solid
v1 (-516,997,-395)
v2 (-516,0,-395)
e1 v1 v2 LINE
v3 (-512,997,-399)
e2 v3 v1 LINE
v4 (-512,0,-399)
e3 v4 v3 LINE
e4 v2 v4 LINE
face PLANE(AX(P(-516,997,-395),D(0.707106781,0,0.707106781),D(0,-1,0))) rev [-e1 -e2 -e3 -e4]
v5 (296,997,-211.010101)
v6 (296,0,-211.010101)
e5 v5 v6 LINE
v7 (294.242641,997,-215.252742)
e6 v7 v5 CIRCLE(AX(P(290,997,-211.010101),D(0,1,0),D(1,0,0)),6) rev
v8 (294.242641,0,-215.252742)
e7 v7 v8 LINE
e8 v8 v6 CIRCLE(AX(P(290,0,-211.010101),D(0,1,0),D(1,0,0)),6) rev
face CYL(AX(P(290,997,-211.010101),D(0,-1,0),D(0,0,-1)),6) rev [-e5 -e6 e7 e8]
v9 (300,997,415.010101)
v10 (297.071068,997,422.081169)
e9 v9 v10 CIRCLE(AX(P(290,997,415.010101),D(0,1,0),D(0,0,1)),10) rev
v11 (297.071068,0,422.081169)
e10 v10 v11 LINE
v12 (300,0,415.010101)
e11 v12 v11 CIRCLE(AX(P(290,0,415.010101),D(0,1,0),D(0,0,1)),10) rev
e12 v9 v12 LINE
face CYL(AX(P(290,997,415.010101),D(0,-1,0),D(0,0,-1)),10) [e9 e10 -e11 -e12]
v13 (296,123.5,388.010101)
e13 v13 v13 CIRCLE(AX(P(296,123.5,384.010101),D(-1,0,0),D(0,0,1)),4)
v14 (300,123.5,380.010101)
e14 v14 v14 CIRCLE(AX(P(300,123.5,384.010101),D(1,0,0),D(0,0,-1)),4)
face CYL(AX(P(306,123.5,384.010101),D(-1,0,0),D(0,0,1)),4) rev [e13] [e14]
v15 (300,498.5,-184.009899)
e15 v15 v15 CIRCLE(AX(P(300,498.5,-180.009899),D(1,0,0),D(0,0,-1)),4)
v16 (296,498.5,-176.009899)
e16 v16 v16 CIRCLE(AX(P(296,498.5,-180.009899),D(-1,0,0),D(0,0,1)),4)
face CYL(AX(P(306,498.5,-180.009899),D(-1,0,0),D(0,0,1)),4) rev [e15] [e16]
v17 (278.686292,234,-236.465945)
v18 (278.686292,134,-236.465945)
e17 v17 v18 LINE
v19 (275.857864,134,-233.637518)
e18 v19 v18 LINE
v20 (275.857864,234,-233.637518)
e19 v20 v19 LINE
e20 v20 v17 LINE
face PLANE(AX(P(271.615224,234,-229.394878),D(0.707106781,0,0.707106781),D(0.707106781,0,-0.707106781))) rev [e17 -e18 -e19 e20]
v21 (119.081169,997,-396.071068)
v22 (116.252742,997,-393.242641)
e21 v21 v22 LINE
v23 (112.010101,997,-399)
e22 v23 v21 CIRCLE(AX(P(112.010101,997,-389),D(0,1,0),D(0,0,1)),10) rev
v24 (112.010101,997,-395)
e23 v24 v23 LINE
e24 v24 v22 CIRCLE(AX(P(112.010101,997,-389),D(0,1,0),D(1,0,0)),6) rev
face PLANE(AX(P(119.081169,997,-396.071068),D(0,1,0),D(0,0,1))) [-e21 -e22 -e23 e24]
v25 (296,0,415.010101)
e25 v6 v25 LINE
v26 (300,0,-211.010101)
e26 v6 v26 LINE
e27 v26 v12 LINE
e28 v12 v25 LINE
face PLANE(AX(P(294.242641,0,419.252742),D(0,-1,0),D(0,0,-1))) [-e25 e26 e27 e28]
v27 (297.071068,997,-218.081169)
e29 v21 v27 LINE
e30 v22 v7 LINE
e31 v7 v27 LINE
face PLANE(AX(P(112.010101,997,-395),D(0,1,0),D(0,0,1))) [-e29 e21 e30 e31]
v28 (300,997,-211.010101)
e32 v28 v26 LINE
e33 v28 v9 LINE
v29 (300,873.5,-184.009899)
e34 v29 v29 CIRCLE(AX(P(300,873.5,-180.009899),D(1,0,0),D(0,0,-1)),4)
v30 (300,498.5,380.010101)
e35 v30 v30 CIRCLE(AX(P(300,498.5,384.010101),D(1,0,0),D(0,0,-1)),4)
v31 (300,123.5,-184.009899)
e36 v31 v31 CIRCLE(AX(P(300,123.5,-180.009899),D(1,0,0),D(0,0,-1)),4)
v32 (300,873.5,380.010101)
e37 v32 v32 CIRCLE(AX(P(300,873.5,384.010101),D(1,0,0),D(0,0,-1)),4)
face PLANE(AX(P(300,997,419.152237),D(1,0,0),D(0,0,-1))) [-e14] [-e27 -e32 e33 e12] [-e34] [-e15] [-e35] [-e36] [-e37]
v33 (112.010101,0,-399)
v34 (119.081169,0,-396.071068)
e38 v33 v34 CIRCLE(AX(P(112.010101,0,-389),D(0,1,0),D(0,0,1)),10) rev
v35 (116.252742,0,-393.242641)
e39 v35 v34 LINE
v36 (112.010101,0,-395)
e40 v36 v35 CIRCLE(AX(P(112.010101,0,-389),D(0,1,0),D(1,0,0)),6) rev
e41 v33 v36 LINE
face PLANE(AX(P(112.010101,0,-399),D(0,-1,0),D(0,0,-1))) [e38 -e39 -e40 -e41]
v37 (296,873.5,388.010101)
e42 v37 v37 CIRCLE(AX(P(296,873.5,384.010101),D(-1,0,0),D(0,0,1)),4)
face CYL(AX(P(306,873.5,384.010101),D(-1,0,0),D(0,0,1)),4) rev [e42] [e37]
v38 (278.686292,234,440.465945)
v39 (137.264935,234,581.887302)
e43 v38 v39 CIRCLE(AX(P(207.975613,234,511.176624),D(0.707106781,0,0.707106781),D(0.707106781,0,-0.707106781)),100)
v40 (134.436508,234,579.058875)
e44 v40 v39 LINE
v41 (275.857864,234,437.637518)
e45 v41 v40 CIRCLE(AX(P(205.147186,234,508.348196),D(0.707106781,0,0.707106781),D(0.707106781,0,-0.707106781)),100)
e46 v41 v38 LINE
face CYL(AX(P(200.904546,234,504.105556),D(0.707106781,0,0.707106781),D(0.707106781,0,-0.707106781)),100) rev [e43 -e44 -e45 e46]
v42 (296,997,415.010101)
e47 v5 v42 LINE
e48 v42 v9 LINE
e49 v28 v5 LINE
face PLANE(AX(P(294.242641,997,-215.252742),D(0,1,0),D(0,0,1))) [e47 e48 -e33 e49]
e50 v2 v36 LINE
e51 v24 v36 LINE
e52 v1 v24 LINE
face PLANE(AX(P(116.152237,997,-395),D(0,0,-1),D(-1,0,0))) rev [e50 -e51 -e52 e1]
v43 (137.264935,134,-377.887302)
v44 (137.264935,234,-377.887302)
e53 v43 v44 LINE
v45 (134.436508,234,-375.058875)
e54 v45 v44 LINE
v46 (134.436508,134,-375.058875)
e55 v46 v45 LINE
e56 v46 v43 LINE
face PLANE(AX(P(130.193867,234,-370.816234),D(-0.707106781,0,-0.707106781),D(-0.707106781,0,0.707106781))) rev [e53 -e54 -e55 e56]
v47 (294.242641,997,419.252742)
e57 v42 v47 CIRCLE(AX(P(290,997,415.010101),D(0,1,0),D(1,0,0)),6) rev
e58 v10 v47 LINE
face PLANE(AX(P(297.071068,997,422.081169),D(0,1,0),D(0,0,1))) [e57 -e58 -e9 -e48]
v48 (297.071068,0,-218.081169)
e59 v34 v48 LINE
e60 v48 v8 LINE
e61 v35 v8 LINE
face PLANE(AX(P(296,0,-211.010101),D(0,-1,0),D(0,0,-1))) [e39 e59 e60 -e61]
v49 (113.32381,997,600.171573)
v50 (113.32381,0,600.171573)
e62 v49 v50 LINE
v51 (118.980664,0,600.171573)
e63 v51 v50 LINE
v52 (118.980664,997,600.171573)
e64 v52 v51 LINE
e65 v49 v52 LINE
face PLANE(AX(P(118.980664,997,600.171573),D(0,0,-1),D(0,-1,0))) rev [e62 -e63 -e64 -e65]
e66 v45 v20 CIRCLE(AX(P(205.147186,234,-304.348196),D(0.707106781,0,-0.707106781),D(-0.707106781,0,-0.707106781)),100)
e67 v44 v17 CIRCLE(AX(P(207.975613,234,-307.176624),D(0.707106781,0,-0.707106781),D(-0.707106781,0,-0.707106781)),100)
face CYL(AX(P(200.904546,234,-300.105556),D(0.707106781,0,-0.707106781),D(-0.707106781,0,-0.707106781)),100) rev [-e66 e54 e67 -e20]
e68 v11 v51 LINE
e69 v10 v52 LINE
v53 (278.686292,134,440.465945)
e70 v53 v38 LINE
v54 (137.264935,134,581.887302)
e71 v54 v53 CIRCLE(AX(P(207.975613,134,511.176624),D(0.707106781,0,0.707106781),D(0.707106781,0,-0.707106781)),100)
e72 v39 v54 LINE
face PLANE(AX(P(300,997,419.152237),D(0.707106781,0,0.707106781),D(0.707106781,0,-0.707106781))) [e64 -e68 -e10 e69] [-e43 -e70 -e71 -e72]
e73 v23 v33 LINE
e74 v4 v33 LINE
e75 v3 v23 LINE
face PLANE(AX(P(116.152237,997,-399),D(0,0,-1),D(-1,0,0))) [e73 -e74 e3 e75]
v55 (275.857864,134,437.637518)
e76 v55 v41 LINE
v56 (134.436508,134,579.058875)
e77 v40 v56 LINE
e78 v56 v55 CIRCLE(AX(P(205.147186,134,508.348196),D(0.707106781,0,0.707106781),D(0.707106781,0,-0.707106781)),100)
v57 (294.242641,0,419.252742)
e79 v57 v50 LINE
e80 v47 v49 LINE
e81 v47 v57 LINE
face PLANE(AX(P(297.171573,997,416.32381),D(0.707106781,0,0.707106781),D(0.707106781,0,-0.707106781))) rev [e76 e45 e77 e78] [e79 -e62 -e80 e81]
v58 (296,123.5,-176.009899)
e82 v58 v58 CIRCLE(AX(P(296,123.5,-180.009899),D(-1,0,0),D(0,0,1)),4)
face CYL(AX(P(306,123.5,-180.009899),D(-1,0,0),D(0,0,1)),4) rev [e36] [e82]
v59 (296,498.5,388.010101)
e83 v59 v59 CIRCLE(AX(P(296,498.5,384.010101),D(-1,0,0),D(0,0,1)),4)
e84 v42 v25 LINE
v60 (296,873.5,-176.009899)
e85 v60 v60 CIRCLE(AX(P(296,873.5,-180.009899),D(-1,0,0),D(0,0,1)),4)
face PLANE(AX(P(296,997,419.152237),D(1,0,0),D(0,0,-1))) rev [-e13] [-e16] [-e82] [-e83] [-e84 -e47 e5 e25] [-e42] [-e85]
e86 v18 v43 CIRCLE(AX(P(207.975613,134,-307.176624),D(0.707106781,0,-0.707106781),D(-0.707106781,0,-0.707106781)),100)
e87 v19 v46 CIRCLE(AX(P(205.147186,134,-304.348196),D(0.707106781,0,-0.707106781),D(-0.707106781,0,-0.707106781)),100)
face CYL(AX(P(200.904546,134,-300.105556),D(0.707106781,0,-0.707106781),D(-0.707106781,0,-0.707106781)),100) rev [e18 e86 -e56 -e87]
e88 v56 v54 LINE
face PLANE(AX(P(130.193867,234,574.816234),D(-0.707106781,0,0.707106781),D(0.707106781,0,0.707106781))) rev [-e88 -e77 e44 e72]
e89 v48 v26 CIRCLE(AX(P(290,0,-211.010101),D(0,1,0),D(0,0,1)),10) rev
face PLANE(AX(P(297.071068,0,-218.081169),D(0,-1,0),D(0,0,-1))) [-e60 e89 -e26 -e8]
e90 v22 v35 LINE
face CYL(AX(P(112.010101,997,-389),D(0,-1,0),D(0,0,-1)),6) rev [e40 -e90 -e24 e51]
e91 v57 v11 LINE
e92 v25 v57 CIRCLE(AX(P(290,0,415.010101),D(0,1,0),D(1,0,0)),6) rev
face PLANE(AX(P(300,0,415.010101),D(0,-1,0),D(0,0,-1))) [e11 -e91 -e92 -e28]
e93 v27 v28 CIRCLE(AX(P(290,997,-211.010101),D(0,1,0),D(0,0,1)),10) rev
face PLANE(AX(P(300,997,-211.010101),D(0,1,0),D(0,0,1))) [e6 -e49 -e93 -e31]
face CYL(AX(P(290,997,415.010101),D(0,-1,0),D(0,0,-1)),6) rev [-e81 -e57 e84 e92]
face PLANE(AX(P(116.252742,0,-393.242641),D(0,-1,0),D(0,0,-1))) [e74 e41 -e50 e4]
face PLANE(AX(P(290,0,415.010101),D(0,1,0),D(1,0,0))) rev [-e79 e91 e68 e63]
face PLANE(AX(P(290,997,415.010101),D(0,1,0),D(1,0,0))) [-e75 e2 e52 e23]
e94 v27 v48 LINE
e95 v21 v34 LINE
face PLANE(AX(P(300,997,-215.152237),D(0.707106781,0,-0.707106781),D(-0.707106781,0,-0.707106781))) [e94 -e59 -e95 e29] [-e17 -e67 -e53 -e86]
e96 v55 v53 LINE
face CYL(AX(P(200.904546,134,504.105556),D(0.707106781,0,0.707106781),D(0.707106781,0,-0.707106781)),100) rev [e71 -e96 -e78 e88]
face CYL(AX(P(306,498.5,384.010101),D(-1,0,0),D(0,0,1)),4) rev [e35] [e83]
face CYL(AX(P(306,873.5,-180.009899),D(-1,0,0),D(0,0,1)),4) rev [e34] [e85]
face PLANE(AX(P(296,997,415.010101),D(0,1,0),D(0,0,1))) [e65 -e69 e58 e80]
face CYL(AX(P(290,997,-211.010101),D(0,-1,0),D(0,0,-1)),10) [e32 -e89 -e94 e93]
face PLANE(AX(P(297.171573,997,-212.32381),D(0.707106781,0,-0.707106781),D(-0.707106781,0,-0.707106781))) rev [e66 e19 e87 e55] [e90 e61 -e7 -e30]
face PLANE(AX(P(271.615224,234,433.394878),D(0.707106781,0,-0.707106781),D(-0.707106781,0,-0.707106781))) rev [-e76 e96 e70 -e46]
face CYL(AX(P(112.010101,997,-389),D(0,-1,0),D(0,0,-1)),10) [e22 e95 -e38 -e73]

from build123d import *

# Parameters (mm, degrees)
BASE_FLANGE1_DEPTH   = 997
CUT_EXTRUDE1_DEPTH   = 10
SKETCH5_R            = 4
CUT_EXTRUDE2_DEPTH   = 10
CUT_EXTRUDE4_DEPTH   = 10
LPATTERN1_COUNT      = 3
LPATTERN1_PITCH      = 375
LPATTERN1_COUNT_DIR2 = 2
LPATTERN1_PITCH_DIR2 = 564.02
CHAMFER1_SIZE        = 4


# Sheet-metal steps are written as plain solids
with BuildPart() as part:
    # Sketch1 → Base-Flange1 (new body)
    with BuildSketch(Plane(origin=(0, 0, 0), x_dir=(1, 0, 0), z_dir=(0, 1, 0))):
        with BuildLine():
            Line((116.152236891, -603), (297.071067812, -422.08116908))
            ThreePointArc((297.071067812, -422.08116908), (299.238795325, -418.836935591), (300, -415.010101268))
            Line((300, -415.010101268), (300, 211.010101268))
            ThreePointArc((300, 211.010101268), (299.238795325, 214.836935591), (297.071067812, 218.08116908))
            Line((297.071067812, 218.08116908), (119.08116908, 396.071067812))
            ThreePointArc((119.08116908, 396.071067812), (115.836935591, 398.238795325), (112.010101268, 399))
            Line((112.010101268, 399), (-516, 399))
            Line((-516, 399), (-516, 395))
            Line((-516, 395), (112.010101268, 395))
            ThreePointArc((112.010101268, 395), (114.306201862, 394.543277195), (116.252741955, 393.242640687))
            Line((116.252741955, 393.242640687), (294.242640687, 215.252741955))
            ThreePointArc((294.242640687, 215.252741955), (295.543277195, 213.306201862), (296, 211.010101268))
            Line((296, 211.010101268), (296, -415.010101268))
            ThreePointArc((296, -415.010101268), (295.543277195, -417.306201862), (294.242640687, -419.252741955))
            Line((294.242640687, -419.252741955), (113.323809767, -600.171572875))
            Line((113.323809767, -600.171572875), (116.152236891, -603))
        make_face()
    extrude(amount=BASE_FLANGE1_DEPTH)

    # Sketch2 → Cut-Extrude1 (cut)
    with BuildSketch(Plane(origin=(257.576118446, 0, -257.576118446), x_dir=(-0.7071067811865485, 0, -0.7071067811865466), z_dir=(0.7071067811865466, 0, -0.7071067811865485))):
        with BuildLine():
            Line((170.145706961, 234), (170.145706961, 134))
            ThreePointArc((170.145706961, 134), (70.145706961, 34), (-29.854293039, 134))
            Line((-29.854293039, 134), (-29.854293039, 234))
            ThreePointArc((-29.854293039, 234), (70.145706961, 334), (170.145706961, 234))
        make_face()
    extrude(amount=-CUT_EXTRUDE1_DEPTH, mode=Mode.SUBTRACT)

    # Sketch5 → Cut-Extrude2 (cut)
    with BuildSketch(Plane.ZY.offset(-296)):
        with Locations((384.010101268, 873.5)):
            Circle(SKETCH5_R)
    cut_extrude2 = extrude(amount=-CUT_EXTRUDE2_DEPTH, mode=Mode.SUBTRACT)

    # Sketch7 → Cut-Extrude4 (cut)
    with BuildSketch(Plane(origin=(359.576118446, 0, 359.576118446), x_dir=(0.7071067811865416, 0, -0.7071067811865536), z_dir=(0.7071067811865536, 0, 0.7071067811865416))):
        with BuildLine():
            Line((-114.395490323, 234), (-114.395490323, 134))
            ThreePointArc((-114.395490323, 134), (-214.395490323, 34), (-314.395490323, 134))
            Line((-314.395490323, 134), (-314.395490323, 234))
            ThreePointArc((-314.395490323, 234), (-214.395490323, 334), (-114.395490323, 234))
        make_face()
    extrude(amount=-CUT_EXTRUDE4_DEPTH, mode=Mode.SUBTRACT)

    # LPattern1: Cut-Extrude2 3 × 2
    with Locations(*[(0, -i * LPATTERN1_PITCH, -j * LPATTERN1_PITCH_DIR2) for i in range(LPATTERN1_COUNT) for j in range(LPATTERN1_COUNT_DIR2) if (i, j) != (0, 0)]):
        add(cut_extrude2, mode=Mode.SUBTRACT)

    # Chamfer1
    chamfer1_edges = [part.edges().sort_by_distance(p)[0] for p in [
        (116.152236891, 498.5, 603),
        (-516, 498.5, -399),
    ]]
    chamfer(chamfer1_edges, length=CHAMFER1_SIZE - 0.0001)  # a hair under: the kernel refuses the full size


solid = part.part
